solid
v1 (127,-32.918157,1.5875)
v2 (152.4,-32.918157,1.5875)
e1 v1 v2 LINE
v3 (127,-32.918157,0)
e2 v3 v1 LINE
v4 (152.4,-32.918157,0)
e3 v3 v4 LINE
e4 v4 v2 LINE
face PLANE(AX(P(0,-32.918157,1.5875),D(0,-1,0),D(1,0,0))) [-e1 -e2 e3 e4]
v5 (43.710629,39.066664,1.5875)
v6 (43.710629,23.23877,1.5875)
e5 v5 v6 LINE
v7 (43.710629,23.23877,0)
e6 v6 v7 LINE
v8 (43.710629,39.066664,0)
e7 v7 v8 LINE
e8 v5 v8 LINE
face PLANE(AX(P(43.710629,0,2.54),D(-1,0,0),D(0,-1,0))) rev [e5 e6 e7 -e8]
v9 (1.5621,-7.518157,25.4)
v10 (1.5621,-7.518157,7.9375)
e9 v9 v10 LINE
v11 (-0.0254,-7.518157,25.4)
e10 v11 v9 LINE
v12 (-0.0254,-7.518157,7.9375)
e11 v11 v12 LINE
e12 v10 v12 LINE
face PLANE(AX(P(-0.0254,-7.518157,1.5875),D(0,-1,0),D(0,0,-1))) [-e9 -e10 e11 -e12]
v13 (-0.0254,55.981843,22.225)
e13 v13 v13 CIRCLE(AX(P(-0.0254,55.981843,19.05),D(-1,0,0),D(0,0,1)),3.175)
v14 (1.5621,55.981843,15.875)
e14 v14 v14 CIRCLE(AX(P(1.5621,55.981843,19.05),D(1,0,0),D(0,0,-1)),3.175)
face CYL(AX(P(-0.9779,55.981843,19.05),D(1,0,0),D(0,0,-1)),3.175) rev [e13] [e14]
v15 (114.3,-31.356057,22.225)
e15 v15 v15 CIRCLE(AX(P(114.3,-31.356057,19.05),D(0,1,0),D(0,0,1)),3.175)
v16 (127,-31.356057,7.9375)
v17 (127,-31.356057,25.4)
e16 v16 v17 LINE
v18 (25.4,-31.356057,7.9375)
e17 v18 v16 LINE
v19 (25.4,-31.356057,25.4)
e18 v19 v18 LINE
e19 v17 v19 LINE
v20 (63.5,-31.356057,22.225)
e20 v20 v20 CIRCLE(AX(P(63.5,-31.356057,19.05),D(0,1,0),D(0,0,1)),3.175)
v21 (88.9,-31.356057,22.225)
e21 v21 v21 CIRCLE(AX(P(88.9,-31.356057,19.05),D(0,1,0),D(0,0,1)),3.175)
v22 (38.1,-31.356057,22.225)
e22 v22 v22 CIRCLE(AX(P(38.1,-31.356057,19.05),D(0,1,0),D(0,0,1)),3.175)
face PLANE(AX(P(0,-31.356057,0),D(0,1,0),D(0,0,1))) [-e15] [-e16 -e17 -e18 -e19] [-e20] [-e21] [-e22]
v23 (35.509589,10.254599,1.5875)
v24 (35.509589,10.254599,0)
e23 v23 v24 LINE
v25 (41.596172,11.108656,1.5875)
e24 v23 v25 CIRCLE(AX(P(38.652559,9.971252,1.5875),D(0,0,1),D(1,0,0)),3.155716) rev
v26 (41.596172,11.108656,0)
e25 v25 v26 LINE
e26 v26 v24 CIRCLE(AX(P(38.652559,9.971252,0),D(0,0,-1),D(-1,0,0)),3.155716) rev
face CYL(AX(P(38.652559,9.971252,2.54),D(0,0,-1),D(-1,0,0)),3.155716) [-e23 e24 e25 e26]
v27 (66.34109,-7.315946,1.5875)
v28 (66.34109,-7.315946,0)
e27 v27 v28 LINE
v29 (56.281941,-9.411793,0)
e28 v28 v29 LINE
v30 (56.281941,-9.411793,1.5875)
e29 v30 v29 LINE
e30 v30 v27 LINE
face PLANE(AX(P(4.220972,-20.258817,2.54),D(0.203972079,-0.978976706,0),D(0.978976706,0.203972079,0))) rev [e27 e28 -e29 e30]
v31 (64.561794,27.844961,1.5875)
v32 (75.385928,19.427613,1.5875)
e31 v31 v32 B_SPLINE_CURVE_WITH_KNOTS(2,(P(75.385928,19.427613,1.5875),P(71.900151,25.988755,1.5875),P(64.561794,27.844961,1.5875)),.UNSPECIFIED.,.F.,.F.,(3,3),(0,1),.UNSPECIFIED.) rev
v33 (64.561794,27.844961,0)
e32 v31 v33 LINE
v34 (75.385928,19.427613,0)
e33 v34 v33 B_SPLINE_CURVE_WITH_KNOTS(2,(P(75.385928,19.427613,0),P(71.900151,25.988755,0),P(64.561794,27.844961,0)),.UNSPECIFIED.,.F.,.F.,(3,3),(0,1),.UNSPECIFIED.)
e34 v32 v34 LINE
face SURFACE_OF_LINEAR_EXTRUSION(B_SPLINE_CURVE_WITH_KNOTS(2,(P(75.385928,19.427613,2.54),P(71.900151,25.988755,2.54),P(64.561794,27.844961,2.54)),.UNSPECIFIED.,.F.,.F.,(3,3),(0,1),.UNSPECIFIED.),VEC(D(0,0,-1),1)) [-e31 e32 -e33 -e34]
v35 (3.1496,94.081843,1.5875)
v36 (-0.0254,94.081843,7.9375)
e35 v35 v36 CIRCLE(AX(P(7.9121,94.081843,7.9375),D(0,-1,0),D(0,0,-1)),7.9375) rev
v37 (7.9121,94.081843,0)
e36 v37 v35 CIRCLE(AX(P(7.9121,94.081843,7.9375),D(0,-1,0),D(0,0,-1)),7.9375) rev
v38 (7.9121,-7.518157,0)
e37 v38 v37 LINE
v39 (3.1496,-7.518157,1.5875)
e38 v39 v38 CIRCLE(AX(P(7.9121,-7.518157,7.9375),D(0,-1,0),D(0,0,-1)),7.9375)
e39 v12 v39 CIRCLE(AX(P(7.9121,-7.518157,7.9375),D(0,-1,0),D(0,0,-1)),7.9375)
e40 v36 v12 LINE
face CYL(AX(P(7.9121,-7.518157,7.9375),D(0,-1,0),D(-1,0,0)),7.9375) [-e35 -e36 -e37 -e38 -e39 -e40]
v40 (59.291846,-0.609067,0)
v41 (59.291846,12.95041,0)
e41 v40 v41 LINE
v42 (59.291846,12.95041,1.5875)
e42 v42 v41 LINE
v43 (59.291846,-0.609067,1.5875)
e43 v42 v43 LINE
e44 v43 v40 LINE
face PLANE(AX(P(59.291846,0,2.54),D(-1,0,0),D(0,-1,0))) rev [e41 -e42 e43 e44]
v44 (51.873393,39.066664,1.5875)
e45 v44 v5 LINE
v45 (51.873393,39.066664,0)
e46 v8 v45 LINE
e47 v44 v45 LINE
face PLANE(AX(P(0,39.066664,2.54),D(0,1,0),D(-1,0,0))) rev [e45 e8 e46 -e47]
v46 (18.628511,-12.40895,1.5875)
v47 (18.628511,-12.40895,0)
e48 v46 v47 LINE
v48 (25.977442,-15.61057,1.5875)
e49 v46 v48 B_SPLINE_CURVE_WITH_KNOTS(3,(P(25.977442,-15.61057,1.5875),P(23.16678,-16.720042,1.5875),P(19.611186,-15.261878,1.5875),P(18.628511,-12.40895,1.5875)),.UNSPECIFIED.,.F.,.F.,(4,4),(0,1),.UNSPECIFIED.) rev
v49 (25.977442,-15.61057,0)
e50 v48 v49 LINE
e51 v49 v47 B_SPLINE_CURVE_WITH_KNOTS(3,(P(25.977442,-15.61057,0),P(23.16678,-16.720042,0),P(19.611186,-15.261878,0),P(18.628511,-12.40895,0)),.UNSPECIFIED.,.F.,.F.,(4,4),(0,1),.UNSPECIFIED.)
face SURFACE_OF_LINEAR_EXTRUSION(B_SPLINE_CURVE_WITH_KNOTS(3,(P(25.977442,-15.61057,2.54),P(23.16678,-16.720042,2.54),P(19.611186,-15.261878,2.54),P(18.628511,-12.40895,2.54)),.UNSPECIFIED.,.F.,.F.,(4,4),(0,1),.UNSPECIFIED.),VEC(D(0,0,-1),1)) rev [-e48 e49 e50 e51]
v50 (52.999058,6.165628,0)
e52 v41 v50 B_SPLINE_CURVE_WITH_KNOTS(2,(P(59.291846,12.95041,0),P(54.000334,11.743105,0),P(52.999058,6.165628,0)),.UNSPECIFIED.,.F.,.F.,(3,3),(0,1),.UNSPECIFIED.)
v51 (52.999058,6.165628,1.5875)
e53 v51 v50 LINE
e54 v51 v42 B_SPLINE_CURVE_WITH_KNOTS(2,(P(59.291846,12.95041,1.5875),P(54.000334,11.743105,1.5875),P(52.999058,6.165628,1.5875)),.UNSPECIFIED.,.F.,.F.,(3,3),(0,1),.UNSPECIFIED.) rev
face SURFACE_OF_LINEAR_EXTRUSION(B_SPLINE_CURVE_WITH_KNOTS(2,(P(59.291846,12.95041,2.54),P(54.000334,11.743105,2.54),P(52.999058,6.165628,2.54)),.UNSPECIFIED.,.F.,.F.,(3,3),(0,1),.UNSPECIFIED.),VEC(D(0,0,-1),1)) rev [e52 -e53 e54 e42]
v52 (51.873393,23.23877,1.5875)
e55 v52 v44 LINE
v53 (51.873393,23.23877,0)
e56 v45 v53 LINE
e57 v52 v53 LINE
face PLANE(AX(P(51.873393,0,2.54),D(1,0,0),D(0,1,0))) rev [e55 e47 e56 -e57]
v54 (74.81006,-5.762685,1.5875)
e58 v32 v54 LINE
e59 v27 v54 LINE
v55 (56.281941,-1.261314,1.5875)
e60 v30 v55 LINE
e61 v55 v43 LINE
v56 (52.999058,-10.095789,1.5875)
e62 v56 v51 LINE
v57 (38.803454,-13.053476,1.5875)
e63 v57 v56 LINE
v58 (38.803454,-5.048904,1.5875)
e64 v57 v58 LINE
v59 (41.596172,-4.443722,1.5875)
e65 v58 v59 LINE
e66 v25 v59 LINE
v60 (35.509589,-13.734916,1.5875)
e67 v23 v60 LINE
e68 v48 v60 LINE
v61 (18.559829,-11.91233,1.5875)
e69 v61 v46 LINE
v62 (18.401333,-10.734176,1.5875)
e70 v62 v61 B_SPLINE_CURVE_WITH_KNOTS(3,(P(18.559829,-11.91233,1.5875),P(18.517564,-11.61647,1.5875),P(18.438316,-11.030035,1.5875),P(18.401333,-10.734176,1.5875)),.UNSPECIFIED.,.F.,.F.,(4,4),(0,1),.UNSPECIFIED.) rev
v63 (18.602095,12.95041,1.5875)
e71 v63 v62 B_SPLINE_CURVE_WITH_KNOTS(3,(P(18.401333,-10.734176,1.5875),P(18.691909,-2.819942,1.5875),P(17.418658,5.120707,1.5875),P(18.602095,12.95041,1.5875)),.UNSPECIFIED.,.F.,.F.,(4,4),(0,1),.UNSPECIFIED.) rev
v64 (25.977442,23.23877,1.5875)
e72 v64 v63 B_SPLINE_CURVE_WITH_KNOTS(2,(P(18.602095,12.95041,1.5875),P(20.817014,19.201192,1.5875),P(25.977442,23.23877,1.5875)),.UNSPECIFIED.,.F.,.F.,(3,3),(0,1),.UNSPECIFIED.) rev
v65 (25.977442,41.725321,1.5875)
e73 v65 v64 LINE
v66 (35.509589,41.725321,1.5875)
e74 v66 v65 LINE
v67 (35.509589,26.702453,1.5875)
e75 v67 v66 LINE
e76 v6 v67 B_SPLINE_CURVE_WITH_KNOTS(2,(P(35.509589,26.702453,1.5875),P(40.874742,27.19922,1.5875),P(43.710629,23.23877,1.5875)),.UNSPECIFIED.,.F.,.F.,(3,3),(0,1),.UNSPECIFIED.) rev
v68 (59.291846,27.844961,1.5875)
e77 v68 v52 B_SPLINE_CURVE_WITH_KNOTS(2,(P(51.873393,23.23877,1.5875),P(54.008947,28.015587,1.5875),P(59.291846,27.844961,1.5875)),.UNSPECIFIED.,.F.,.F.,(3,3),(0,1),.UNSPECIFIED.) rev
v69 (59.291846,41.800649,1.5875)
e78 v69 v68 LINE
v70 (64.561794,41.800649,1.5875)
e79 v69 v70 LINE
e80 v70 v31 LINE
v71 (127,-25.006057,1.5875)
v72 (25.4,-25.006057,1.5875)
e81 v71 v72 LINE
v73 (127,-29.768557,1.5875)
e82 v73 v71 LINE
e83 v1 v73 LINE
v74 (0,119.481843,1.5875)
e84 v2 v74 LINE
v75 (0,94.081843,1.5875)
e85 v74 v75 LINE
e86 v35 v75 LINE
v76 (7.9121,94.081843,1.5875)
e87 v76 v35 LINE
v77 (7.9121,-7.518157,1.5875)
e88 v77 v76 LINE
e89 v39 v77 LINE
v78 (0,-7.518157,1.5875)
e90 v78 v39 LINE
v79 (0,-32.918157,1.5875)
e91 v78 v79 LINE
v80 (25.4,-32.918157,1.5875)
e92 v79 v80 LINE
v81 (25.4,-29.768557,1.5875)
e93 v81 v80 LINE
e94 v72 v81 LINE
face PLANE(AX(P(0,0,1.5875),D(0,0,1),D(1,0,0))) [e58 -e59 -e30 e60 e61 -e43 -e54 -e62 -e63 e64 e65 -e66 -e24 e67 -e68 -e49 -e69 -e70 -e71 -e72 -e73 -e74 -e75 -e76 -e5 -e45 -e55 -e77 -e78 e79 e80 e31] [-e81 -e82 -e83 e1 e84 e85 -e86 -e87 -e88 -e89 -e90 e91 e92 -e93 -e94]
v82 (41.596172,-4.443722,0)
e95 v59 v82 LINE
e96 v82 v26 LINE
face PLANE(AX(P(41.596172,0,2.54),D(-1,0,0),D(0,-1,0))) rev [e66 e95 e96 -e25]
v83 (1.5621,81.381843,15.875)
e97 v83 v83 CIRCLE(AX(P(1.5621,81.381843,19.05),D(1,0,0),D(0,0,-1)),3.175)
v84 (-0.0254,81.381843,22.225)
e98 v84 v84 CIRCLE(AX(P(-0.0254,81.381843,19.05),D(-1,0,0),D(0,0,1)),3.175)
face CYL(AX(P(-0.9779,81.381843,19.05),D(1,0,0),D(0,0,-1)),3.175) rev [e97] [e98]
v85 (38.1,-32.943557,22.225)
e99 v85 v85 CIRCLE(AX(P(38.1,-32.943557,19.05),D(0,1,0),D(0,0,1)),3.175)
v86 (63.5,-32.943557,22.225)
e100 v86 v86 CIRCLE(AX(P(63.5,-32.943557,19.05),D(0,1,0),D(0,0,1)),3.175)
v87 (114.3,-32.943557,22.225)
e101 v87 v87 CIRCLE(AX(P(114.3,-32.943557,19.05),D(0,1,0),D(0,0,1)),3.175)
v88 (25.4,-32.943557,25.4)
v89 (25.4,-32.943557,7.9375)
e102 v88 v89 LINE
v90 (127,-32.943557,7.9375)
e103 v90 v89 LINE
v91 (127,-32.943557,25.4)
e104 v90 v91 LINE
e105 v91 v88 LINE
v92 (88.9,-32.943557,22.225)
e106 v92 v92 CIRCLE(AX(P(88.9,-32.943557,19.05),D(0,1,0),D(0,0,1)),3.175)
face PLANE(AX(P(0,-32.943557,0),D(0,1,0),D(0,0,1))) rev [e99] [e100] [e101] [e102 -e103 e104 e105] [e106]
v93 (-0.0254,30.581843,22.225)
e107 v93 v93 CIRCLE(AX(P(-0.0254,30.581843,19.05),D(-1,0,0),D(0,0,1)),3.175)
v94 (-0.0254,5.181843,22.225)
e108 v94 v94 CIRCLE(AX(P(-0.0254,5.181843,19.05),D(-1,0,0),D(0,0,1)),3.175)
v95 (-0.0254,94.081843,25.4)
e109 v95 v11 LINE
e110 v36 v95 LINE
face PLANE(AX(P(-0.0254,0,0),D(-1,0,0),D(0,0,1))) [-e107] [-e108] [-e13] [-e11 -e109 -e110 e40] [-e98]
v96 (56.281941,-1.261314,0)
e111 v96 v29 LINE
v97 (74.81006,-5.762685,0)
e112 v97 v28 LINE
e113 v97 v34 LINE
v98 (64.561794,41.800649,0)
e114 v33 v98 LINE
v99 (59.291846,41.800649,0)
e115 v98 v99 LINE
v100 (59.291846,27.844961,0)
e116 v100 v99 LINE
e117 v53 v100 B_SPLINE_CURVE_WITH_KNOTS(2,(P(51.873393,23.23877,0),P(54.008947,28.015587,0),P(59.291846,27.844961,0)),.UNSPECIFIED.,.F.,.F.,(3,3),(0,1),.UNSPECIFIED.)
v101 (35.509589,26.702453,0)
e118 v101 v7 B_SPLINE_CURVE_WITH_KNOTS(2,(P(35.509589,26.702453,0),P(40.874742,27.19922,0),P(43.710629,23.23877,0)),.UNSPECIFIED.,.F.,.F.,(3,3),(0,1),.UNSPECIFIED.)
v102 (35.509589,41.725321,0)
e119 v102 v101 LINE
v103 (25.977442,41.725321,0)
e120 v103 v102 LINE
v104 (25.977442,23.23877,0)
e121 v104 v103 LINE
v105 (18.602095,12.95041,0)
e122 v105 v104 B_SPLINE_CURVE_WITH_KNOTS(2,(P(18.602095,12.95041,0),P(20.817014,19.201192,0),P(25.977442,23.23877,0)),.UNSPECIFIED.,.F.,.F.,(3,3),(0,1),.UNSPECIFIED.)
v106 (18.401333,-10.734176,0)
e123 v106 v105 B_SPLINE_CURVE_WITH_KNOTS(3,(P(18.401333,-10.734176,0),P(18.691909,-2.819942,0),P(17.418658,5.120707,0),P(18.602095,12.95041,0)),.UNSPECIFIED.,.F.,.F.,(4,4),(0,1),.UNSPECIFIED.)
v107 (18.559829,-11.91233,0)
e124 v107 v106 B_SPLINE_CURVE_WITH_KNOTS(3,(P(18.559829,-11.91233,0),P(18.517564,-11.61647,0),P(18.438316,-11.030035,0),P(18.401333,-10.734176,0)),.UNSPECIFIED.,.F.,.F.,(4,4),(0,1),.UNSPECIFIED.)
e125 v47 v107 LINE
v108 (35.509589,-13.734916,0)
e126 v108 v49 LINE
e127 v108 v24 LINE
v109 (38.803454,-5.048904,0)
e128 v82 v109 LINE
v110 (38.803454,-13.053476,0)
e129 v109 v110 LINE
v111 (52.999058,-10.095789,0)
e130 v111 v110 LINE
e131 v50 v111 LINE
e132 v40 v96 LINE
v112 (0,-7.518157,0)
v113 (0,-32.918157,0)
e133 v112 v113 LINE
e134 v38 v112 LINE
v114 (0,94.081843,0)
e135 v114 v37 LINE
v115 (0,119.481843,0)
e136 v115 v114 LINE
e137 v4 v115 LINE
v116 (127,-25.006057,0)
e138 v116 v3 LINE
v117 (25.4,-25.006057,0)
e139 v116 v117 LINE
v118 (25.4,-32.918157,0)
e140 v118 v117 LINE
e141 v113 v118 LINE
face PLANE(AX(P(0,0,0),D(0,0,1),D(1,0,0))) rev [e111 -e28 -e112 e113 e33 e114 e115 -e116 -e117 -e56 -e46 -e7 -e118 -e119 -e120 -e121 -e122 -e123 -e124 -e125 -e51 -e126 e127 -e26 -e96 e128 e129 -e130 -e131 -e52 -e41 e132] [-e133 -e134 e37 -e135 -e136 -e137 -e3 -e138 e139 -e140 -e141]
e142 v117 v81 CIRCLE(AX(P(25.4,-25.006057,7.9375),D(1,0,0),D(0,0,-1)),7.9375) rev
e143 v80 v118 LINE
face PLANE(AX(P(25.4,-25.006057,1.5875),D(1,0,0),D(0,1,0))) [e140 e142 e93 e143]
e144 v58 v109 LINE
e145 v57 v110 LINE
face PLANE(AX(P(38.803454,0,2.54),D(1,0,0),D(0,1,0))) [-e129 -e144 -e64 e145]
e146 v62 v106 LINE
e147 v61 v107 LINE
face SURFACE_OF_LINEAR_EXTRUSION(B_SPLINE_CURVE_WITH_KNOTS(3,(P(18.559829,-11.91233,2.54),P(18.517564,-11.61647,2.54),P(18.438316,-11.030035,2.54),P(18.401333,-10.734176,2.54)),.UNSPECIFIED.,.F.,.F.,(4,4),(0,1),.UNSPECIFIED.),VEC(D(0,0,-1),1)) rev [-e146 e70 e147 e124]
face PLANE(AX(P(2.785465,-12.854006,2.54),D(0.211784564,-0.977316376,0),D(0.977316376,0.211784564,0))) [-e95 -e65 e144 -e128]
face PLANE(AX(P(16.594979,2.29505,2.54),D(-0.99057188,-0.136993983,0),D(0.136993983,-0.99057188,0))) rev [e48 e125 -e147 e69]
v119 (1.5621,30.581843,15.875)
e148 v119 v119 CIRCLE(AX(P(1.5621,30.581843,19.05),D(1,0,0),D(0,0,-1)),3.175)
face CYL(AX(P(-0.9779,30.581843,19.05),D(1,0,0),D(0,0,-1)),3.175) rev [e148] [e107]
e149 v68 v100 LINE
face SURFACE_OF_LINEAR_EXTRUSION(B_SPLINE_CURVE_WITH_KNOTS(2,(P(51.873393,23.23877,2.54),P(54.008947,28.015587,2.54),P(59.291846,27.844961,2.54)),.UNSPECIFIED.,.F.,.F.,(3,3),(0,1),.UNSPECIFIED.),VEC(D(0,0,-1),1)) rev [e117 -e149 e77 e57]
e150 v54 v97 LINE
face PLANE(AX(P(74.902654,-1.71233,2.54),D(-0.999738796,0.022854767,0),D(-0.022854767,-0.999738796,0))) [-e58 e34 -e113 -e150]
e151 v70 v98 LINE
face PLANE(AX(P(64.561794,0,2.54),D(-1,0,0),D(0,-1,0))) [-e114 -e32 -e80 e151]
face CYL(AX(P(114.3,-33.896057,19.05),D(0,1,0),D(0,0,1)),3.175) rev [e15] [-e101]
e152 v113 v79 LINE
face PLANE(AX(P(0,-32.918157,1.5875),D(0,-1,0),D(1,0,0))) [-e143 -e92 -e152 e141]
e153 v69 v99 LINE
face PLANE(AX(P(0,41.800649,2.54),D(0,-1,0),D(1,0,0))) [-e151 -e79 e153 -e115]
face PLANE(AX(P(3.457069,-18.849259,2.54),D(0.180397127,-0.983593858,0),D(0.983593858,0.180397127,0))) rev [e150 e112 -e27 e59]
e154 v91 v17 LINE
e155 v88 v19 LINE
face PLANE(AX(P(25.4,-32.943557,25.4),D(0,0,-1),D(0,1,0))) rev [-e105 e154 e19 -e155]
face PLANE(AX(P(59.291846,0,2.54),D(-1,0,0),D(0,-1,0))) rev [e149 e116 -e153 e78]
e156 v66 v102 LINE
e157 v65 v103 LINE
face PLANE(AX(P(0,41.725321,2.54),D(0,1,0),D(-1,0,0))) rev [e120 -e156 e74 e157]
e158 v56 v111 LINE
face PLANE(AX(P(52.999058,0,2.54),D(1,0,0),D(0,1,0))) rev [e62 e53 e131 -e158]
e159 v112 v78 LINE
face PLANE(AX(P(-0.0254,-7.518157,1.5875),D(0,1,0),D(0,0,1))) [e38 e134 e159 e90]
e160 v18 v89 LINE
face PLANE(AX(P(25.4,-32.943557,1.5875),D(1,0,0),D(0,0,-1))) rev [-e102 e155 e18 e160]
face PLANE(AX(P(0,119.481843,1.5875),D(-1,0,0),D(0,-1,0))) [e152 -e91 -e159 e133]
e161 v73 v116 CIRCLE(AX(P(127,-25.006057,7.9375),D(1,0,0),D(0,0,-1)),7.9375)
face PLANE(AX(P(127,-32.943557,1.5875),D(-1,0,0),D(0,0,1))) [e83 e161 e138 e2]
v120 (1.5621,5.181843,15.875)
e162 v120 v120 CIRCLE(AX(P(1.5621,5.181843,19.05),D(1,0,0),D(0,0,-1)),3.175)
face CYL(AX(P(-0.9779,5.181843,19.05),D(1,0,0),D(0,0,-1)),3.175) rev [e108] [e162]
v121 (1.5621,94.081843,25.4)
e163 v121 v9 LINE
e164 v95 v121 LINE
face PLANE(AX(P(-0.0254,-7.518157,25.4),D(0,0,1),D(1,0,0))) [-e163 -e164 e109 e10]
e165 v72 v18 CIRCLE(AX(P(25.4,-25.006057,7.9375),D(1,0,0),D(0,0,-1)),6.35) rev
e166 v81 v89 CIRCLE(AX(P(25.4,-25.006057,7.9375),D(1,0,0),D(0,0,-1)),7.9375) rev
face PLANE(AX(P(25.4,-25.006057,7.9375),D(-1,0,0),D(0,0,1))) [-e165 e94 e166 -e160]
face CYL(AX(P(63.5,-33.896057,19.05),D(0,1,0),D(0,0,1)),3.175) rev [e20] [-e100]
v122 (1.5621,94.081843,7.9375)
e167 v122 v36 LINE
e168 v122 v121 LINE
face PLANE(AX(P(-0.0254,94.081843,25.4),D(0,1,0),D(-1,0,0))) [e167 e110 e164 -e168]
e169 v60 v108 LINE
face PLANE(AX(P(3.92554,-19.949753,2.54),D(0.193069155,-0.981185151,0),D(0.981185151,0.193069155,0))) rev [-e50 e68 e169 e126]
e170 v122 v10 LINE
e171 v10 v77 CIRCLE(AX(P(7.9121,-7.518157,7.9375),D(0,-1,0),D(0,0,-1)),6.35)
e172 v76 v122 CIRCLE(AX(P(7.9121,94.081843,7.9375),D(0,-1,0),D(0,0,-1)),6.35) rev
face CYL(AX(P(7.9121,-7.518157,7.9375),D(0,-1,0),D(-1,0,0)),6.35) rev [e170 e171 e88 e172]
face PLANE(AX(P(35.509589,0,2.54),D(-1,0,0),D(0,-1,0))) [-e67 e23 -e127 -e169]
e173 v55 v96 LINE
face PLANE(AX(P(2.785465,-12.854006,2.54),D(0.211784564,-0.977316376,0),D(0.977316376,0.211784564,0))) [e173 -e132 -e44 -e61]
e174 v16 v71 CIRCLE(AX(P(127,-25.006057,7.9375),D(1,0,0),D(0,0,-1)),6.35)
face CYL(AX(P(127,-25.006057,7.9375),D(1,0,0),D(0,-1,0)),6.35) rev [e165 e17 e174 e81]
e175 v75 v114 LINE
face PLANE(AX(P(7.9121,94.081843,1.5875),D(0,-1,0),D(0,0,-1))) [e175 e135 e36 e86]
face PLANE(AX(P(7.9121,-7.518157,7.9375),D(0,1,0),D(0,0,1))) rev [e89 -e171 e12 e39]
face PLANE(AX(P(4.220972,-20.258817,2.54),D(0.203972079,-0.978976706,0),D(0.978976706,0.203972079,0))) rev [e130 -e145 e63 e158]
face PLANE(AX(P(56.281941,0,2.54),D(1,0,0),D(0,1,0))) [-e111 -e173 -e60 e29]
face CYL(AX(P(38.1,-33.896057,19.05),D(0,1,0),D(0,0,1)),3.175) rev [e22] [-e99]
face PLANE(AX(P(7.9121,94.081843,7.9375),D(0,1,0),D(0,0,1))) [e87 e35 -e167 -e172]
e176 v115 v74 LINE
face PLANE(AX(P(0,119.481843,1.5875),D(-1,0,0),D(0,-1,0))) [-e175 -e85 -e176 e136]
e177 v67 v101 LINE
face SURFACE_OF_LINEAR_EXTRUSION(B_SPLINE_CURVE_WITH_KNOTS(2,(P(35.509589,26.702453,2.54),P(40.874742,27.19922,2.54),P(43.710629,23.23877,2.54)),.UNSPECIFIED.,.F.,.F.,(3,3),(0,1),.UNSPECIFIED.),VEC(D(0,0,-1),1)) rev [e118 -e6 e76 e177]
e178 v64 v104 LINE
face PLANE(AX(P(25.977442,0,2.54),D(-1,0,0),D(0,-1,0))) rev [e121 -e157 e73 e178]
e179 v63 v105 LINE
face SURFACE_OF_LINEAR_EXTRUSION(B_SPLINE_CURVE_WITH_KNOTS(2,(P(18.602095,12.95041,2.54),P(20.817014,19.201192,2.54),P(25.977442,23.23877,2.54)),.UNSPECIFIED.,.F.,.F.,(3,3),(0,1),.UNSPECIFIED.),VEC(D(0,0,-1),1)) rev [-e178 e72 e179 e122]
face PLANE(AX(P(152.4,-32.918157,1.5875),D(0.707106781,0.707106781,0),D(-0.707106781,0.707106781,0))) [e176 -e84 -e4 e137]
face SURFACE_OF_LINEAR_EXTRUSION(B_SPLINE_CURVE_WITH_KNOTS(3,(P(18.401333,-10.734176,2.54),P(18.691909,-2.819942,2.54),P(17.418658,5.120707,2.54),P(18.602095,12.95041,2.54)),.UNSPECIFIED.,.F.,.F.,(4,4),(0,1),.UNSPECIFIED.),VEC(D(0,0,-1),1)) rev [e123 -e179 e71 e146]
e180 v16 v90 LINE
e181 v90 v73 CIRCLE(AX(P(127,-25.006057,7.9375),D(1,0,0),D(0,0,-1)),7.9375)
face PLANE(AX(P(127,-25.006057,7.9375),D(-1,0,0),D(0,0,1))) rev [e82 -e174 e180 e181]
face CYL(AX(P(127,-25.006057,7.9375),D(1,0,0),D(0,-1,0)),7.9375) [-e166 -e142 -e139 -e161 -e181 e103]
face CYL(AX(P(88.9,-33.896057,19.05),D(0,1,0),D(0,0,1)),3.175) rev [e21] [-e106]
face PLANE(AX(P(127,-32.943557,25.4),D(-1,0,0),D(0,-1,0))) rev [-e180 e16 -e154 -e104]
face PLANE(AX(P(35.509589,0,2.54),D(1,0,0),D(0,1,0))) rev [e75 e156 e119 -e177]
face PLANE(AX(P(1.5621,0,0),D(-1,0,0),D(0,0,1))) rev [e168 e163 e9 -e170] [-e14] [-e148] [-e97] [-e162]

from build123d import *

# Parameters (mm, degrees)
BOSS_EXTRUDE1_DEPTH          = 1.5875
SKETCH7_W                    = 1.5875
SKETCH7_H                    = 101.6
BOSS_EXTRUDE2_DEPTH          = 0.0254
EDGE_FLANGE1_STRIP_W         = 19.05
EDGE_FLANGE1_STRIP_H         = 1.5875
EDGE_FLANGE1_STRIP_CUT_DEPTH = 101.6
EDGE_FLANGE1_DEPTH           = 101.6
SKETCH11_W                   = 101.6
SKETCH11_H                   = 1.5875
BOSS_EXTRUDE3_DEPTH          = 0.0254
EDGE_FLANGE2_STRIP_W         = 19.05
EDGE_FLANGE2_STRIP_H         = 1.5875
EDGE_FLANGE2_STRIP_CUT_DEPTH = 101.6
EDGE_FLANGE2_DEPTH           = 101.6
SKETCH15_R                   = 3.175
CUT_EXTRUDE1_DEPTH           = 2.54
SKETCH16_R                   = 3.175
CUT_EXTRUDE2_DEPTH           = 2.54
CUT_EXTRUDE4_DEPTH           = 2.54


# Sheet-metal steps are written as plain solids
with BuildPart() as part:
    # Sketch1 → Boss-Extrude1 (new body)
    with BuildSketch(Plane.XY):
        Polygon((0, 119.481843199), (0, -32.918156801), (152.4, -32.918156801), align=None)
    extrude(amount=BOSS_EXTRUDE1_DEPTH)

    # Sketch7 → Boss-Extrude2 (add)
    with BuildSketch(Plane.ZY):
        with Locations((0.79375, 43.281843199)):
            Rectangle(SKETCH7_W, SKETCH7_H)
    extrude(amount=BOSS_EXTRUDE2_DEPTH)

    # Edge-Flange1 strip (across the edge) → Edge-Flange1 strip cut (cut)
    with BuildSketch(Plane(origin=(-0.0254, 94.081843199, 1.5875), x_dir=(1, 0, 0), z_dir=(0, -1, 0))):
        with Locations((-1.5875, -0.79375)):
            Rectangle(EDGE_FLANGE1_STRIP_W, EDGE_FLANGE1_STRIP_H)
    extrude(amount=EDGE_FLANGE1_STRIP_CUT_DEPTH, mode=Mode.SUBTRACT)

    # Edge-Flange1 section (across the edge) → Edge-Flange1 (add)
    with BuildSketch(Plane(origin=(-0.0254, 94.081843199, 1.5875), x_dir=(1, 0, 0), z_dir=(0, -1, 0))):
        with BuildLine():
            Line((0, 6.35), (0, 23.8125))
            Line((0, 23.8125), (1.5875, 23.8125))
            Line((1.5875, 23.8125), (1.5875, 6.35))
            ThreePointArc((1.5875, 6.35), (3.447371939, 1.859871939), (7.9375, 0))
            Line((7.9375, 0), (7.9375, -1.5875))
            ThreePointArc((7.9375, -1.5875), (2.324839924, 0.737339924), (0, 6.35))
        make_face()
    extrude(amount=EDGE_FLANGE1_DEPTH)

    # Sketch11 → Boss-Extrude3 (add)
    with BuildSketch(Plane(origin=(0, -32.918156801, 0), x_dir=(-1, 0, 0), z_dir=(0, -1, 0))):
        with Locations((-76.2, -0.79375)):
            Rectangle(SKETCH11_W, SKETCH11_H)
    extrude(amount=BOSS_EXTRUDE3_DEPTH)

    # Edge-Flange2 strip (across the edge) → Edge-Flange2 strip cut (cut)
    with BuildSketch(Plane(origin=(25.4, -32.943556801, 1.5875), x_dir=(0, 1, 0), z_dir=(1, 0, 0))):
        with Locations((-1.5875, -0.79375)):
            Rectangle(EDGE_FLANGE2_STRIP_W, EDGE_FLANGE2_STRIP_H)
    extrude(amount=EDGE_FLANGE2_STRIP_CUT_DEPTH, mode=Mode.SUBTRACT)

    # Edge-Flange2 section (across the edge) → Edge-Flange2 (add)
    with BuildSketch(Plane(origin=(25.4, -32.943556801, 1.5875), x_dir=(0, 1, 0), z_dir=(1, 0, 0))):
        with BuildLine():
            Line((0, 6.35), (0, 23.8125))
            Line((0, 23.8125), (1.5875, 23.8125))
            Line((1.5875, 23.8125), (1.5875, 6.35))
            ThreePointArc((1.5875, 6.35), (3.447371939, 1.859871939), (7.9375, 0))
            Line((7.9375, 0), (7.9375, -1.5875))
            ThreePointArc((7.9375, -1.5875), (2.324839924, 0.737339924), (0, 6.35))
        make_face()
    extrude(amount=EDGE_FLANGE2_DEPTH)

    # Sketch15 → Cut-Extrude1 (cut)
    with BuildSketch(Plane(origin=(0, -31.356056801, 0), x_dir=(1, 0, 0), z_dir=(0, 1, 0))):
        with Locations(Location((38.1, -19.05, 0), (0, 0, 270))):
            Circle(SKETCH15_R)
        with Locations(Location((63.5, -19.05, 0), (0, 0, 270))):
            Circle(SKETCH15_R)
        with Locations(Location((88.9, -19.05, 0), (0, 0, 270))):
            Circle(SKETCH15_R)
        with Locations(Location((114.3, -19.05, 0), (0, 0, 270))):
            Circle(SKETCH15_R)
    extrude(amount=-CUT_EXTRUDE1_DEPTH, mode=Mode.SUBTRACT)

    # Sketch16 → Cut-Extrude2 (cut)
    with BuildSketch(Plane(origin=(1.5621, 0, 0), x_dir=(0, 0, -1), z_dir=(1, 0, 0))):
        with Locations((-19.05, 81.381843199)):
            Circle(SKETCH16_R)
        with Locations((-19.05, 55.981843199)):
            Circle(SKETCH16_R)
        with Locations((-19.05, 30.581843199)):
            Circle(SKETCH16_R)
        with Locations((-19.05, 5.181843199)):
            Circle(SKETCH16_R)
    extrude(amount=-CUT_EXTRUDE2_DEPTH, mode=Mode.SUBTRACT)

    # Sketch17 → Cut-Extrude4 (cut)
    with BuildSketch(Plane(origin=(0, 0, 0), x_dir=(-1, 0, 0), z_dir=(0, 0, -1))):
        with BuildLine():
            add(Edge.make_bspline(
                [(-18.559829118, -11.912329653), (-18.517563518, -11.616470453), (-18.438315518, -11.030035253), (-18.401333118, -10.734176053)],
                knots=[0, 0, 0, 0, 1, 1, 1, 1], degree=3))
            add(Edge.make_bspline(
                [(-18.401333118, -10.734176053), (-18.691909118, -2.819942453), (-17.418657918, 5.120707147), (-18.602094718, 12.950409547)],
                knots=[0, 0, 0, 0, 1, 1, 1, 1], degree=3))
            add(Edge.make_bspline(
                [(-18.602094718, 12.950409547), (-20.817014275, 19.201191532), (-25.977441918, 23.238769538)],
                knots=[0, 0, 0, 1, 1, 1], degree=2))
            Line((-25.977441918, 23.238769538), (-25.977441918, 41.725320732))
            Line((-25.977441918, 41.725320732), (-35.509588786, 41.725320732))
            Line((-35.509588786, 41.725320732), (-35.509588786, 26.702452856))
            add(Edge.make_bspline(
                [(-35.509588786, 26.702452856), (-40.874741805, 27.199220364), (-43.710628887, 23.238769538)],
                knots=[0, 0, 0, 1, 1, 1], degree=2))
            Line((-43.710628887, 23.238769538), (-43.710628887, 39.06666413))
            Line((-43.710628887, 39.06666413), (-51.873392585, 39.06666413))
            Line((-51.873392585, 39.06666413), (-51.873392585, 23.238769538))
            add(Edge.make_bspline(
                [(-51.873392585, 23.238769538), (-54.008947234, 28.015586517), (-59.291846155, 27.844961118)],
                knots=[0, 0, 0, 1, 1, 1], degree=2))
            Line((-59.291846155, 27.844961118), (-59.291846155, 41.800648781))
            Line((-59.291846155, 41.800648781), (-64.561793613, 41.800648781))
            Line((-64.561793613, 41.800648781), (-64.561793613, 27.844961118))
            add(Edge.make_bspline(
                [(-75.385928318, 19.427612747), (-71.900151449, 25.9887548), (-64.561793613, 27.844961118)],
                knots=[0, 0, 0, 1, 1, 1], degree=2))
            Line((-75.385928318, 19.427612747), (-74.810059518, -5.762684853))
            Line((-74.810059518, -5.762684853), (-66.341089918, -7.315945653))
            Line((-66.341089918, -7.315945653), (-56.281940787, -9.411792826))
            Line((-56.281940787, -9.411792826), (-56.281940787, -1.261313945))
            Line((-56.281940787, -1.261313945), (-59.291846155, -0.609067129))
            Line((-59.291846155, -0.609067129), (-59.291846155, 12.950409547))
            add(Edge.make_bspline(
                [(-59.291846155, 12.950409547), (-54.000334372, 11.743104523), (-52.999057908, 6.165627848)],
                knots=[0, 0, 0, 1, 1, 1], degree=2))
            Line((-52.999057908, 6.165627848), (-52.999057908, -1.972715017))
            Line((-52.999057908, -1.972715017), (-52.999057908, -10.095789128))
            Line((-52.999057908, -10.095789128), (-38.803453862, -13.053476327))
            Line((-38.803453862, -13.053476327), (-38.803453862, -5.048903937))
            Line((-38.803453862, -5.048903937), (-41.596172219, -4.44372157))
            Line((-41.596172219, -4.44372157), (-41.596172219, 11.108656065))
            ThreePointArc((-41.596172219, 11.108656065), (-38.214050979, 13.096353593), (-35.509588786, 10.254598891))
            Line((-35.509588786, 10.254598891), (-35.509588786, -5.762684853))
            Line((-35.509588786, -5.762684853), (-35.509588786, -13.734915973))
            Line((-35.509588786, -13.734915973), (-25.977441918, -15.610569653))
            add(Edge.make_bspline(
                [(-25.977441918, -15.610569653), (-23.166779518, -16.720041653), (-19.611185918, -15.261878453), (-18.628510718, -12.408950453)],
                knots=[0, 0, 0, 0, 1, 1, 1, 1], degree=3))
            Line((-18.628510718, -12.408950453), (-18.559829118, -11.912329653))
        make_face()
    extrude(amount=-CUT_EXTRUDE4_DEPTH, mode=Mode.SUBTRACT)


solid = part.part
